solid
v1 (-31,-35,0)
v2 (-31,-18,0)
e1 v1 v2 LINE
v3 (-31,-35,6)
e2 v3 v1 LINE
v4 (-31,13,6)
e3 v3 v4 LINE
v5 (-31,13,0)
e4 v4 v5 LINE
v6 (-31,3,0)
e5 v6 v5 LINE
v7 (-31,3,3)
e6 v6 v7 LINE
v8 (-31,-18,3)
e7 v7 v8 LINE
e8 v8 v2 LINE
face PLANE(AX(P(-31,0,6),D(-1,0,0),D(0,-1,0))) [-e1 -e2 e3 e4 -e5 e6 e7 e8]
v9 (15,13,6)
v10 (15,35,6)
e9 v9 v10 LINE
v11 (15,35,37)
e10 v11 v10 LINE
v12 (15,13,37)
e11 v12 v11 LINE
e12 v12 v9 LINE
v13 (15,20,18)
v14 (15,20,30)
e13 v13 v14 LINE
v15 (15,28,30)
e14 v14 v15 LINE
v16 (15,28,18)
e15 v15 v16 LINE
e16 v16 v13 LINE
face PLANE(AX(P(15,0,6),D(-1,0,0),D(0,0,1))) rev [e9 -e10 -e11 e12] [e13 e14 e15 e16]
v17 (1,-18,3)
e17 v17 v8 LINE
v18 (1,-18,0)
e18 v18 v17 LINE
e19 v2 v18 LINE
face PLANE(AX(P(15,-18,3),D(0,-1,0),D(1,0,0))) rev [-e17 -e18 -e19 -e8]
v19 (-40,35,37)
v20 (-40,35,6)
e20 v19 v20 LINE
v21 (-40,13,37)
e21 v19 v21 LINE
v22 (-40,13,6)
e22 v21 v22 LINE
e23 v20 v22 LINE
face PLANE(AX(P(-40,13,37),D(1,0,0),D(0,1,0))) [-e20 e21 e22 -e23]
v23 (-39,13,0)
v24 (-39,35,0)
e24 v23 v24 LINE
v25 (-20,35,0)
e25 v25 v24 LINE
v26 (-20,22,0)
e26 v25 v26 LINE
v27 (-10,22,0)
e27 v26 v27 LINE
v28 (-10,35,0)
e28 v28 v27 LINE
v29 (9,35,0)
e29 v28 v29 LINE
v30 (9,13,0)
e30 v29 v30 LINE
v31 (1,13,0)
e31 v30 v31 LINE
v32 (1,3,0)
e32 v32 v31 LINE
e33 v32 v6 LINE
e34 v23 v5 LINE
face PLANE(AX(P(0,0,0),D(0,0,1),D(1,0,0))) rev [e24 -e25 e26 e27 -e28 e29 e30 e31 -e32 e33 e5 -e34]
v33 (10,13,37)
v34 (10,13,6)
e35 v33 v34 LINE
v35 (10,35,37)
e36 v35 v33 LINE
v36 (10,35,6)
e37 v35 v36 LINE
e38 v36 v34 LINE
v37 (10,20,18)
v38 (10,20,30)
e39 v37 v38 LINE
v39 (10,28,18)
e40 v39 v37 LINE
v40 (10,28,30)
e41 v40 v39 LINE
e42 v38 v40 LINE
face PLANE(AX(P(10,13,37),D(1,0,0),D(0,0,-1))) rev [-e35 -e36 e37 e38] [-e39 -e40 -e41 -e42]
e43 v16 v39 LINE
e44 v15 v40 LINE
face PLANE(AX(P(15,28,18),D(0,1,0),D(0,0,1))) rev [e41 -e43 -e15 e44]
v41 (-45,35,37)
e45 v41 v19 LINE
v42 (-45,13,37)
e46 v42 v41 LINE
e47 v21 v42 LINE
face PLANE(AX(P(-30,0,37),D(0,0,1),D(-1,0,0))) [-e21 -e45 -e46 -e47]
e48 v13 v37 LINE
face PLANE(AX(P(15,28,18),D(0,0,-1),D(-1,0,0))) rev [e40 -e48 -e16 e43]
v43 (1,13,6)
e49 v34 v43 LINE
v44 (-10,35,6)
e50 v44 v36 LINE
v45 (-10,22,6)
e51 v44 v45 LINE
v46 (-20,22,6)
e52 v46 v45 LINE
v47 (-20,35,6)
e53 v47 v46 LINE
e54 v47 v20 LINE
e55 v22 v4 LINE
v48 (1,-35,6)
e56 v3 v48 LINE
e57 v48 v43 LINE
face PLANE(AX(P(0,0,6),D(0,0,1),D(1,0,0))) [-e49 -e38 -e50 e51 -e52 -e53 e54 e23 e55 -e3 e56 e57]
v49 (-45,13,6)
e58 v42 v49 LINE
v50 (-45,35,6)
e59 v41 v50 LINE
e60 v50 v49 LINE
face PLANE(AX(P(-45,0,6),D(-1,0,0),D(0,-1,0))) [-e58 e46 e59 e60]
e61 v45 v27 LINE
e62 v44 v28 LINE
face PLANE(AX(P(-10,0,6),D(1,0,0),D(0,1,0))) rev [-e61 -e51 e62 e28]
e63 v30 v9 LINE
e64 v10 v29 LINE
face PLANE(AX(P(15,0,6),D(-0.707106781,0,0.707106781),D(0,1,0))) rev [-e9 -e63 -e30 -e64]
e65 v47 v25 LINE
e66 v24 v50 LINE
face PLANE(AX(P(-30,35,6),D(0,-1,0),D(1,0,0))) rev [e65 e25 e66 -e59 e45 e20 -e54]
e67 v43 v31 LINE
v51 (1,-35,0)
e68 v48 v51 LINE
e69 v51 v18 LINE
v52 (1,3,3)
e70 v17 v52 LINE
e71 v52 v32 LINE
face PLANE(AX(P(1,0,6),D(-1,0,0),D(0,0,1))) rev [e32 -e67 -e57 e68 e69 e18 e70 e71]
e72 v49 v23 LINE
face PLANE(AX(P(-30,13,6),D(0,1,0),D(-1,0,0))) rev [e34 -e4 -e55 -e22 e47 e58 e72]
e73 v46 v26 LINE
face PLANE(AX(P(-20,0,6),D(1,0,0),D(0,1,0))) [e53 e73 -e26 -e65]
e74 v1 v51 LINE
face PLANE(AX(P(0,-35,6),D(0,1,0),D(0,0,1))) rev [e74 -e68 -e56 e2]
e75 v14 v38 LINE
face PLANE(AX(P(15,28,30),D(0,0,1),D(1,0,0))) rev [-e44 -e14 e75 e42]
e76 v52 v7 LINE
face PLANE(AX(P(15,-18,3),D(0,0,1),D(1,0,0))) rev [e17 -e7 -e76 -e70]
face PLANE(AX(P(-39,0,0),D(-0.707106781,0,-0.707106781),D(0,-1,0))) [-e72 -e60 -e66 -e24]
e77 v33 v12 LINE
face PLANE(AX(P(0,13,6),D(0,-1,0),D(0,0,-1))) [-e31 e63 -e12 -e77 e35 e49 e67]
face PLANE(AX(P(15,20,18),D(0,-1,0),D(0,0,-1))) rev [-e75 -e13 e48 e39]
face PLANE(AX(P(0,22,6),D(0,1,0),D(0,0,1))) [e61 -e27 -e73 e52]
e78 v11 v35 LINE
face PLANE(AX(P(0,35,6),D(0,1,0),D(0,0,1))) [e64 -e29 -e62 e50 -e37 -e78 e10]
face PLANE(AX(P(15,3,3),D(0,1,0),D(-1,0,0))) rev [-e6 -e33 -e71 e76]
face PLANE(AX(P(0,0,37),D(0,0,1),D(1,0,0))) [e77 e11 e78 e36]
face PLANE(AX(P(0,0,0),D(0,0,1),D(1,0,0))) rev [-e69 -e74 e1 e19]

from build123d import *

# Parameters (mm, degrees)
EXTRUDE_1_DEPTH            = 6
SKETCH_2_W                 = 5
SKETCH_2_H                 = 22
EXTRUDE_2_DEPTH            = 31
CHAMFER_1_SIZE             = 6
SKETCH_3_W                 = 12
SKETCH_3_H                 = 8
CUT_EXTRUDE_1_DEPTH        = 57.73623181
SKETCH_4_W                 = 3
SKETCH_4_H                 = 21
CUT_EXTRUDE_2_DEPTH        = 60.110066825
CHAMFER_1_OF_MIRROR_1_SIZE = 6


with BuildPart() as part:
    # Эскиз1 → Бобышка-Вытянуть1 (new body)
    with BuildSketch(Plane.XY):
        Polygon((-15, 22), (-15, -35), (1, -35), (1, 13), (15, 13), (15, 35), (-10, 35), (-10, 22), align=None)
    extrude_1 = extrude(amount=EXTRUDE_1_DEPTH)

    # Эскиз2 → Бобышка-Вытянуть2 (add)
    with BuildSketch(Plane.XY.offset(6)):
        with Locations((12.5, 24)):
            Rectangle(SKETCH_2_W, SKETCH_2_H)
    extrude_2 = extrude(amount=EXTRUDE_2_DEPTH)

    # Фаска1
    chamfer_1_edges = [part.edges().sort_by_distance(p)[0] for p in [
        (15, 24, 0),
    ]]
    chamfer(chamfer_1_edges, length=CHAMFER_1_SIZE)

    # Эскиз3 → Вырез-Вытянуть1 (cut, through all)
    with BuildSketch(Plane.ZY.offset(-10)):
        with Locations((24, 24)):
            Rectangle(SKETCH_3_W, SKETCH_3_H)
    extrude(amount=-CUT_EXTRUDE_1_DEPTH, mode=Mode.SUBTRACT)

    # Эскиз4 → Вырез-Вытянуть2 (cut, through all)
    with BuildSketch(Plane.ZY.offset(15)):
        with Locations((1.5, -7.5)):
            Rectangle(SKETCH_4_W, SKETCH_4_H)
    cut_extrude_2 = extrude(amount=-CUT_EXTRUDE_2_DEPTH, mode=Mode.SUBTRACT)

    # Зеркальное отражение1: Бобышка-Вытянуть1, Бобышка-Вытянуть2, Вырез-Вытянуть2 across plane
    add(extrude_1.mirror(Plane(origin=(-15, 0, 6), x_dir=(0, 0, 1), z_dir=(-1, 0, 0))))
    add(extrude_2.mirror(Plane(origin=(-15, 0, 6), x_dir=(0, 0, 1), z_dir=(-1, 0, 0))))
    add(cut_extrude_2.mirror(Plane(origin=(-15, 0, 6), x_dir=(0, 0, 1), z_dir=(-1, 0, 0))), mode=Mode.SUBTRACT)

    # Фаска1 of Зеркальное отражение1
    chamfer_1_of_mirror_1_edges = [part.edges().sort_by_distance(p)[0] for p in [
        (-45, 24, 0),
    ]]
    chamfer(chamfer_1_of_mirror_1_edges, length=CHAMFER_1_OF_MIRROR_1_SIZE)


solid = part.part
